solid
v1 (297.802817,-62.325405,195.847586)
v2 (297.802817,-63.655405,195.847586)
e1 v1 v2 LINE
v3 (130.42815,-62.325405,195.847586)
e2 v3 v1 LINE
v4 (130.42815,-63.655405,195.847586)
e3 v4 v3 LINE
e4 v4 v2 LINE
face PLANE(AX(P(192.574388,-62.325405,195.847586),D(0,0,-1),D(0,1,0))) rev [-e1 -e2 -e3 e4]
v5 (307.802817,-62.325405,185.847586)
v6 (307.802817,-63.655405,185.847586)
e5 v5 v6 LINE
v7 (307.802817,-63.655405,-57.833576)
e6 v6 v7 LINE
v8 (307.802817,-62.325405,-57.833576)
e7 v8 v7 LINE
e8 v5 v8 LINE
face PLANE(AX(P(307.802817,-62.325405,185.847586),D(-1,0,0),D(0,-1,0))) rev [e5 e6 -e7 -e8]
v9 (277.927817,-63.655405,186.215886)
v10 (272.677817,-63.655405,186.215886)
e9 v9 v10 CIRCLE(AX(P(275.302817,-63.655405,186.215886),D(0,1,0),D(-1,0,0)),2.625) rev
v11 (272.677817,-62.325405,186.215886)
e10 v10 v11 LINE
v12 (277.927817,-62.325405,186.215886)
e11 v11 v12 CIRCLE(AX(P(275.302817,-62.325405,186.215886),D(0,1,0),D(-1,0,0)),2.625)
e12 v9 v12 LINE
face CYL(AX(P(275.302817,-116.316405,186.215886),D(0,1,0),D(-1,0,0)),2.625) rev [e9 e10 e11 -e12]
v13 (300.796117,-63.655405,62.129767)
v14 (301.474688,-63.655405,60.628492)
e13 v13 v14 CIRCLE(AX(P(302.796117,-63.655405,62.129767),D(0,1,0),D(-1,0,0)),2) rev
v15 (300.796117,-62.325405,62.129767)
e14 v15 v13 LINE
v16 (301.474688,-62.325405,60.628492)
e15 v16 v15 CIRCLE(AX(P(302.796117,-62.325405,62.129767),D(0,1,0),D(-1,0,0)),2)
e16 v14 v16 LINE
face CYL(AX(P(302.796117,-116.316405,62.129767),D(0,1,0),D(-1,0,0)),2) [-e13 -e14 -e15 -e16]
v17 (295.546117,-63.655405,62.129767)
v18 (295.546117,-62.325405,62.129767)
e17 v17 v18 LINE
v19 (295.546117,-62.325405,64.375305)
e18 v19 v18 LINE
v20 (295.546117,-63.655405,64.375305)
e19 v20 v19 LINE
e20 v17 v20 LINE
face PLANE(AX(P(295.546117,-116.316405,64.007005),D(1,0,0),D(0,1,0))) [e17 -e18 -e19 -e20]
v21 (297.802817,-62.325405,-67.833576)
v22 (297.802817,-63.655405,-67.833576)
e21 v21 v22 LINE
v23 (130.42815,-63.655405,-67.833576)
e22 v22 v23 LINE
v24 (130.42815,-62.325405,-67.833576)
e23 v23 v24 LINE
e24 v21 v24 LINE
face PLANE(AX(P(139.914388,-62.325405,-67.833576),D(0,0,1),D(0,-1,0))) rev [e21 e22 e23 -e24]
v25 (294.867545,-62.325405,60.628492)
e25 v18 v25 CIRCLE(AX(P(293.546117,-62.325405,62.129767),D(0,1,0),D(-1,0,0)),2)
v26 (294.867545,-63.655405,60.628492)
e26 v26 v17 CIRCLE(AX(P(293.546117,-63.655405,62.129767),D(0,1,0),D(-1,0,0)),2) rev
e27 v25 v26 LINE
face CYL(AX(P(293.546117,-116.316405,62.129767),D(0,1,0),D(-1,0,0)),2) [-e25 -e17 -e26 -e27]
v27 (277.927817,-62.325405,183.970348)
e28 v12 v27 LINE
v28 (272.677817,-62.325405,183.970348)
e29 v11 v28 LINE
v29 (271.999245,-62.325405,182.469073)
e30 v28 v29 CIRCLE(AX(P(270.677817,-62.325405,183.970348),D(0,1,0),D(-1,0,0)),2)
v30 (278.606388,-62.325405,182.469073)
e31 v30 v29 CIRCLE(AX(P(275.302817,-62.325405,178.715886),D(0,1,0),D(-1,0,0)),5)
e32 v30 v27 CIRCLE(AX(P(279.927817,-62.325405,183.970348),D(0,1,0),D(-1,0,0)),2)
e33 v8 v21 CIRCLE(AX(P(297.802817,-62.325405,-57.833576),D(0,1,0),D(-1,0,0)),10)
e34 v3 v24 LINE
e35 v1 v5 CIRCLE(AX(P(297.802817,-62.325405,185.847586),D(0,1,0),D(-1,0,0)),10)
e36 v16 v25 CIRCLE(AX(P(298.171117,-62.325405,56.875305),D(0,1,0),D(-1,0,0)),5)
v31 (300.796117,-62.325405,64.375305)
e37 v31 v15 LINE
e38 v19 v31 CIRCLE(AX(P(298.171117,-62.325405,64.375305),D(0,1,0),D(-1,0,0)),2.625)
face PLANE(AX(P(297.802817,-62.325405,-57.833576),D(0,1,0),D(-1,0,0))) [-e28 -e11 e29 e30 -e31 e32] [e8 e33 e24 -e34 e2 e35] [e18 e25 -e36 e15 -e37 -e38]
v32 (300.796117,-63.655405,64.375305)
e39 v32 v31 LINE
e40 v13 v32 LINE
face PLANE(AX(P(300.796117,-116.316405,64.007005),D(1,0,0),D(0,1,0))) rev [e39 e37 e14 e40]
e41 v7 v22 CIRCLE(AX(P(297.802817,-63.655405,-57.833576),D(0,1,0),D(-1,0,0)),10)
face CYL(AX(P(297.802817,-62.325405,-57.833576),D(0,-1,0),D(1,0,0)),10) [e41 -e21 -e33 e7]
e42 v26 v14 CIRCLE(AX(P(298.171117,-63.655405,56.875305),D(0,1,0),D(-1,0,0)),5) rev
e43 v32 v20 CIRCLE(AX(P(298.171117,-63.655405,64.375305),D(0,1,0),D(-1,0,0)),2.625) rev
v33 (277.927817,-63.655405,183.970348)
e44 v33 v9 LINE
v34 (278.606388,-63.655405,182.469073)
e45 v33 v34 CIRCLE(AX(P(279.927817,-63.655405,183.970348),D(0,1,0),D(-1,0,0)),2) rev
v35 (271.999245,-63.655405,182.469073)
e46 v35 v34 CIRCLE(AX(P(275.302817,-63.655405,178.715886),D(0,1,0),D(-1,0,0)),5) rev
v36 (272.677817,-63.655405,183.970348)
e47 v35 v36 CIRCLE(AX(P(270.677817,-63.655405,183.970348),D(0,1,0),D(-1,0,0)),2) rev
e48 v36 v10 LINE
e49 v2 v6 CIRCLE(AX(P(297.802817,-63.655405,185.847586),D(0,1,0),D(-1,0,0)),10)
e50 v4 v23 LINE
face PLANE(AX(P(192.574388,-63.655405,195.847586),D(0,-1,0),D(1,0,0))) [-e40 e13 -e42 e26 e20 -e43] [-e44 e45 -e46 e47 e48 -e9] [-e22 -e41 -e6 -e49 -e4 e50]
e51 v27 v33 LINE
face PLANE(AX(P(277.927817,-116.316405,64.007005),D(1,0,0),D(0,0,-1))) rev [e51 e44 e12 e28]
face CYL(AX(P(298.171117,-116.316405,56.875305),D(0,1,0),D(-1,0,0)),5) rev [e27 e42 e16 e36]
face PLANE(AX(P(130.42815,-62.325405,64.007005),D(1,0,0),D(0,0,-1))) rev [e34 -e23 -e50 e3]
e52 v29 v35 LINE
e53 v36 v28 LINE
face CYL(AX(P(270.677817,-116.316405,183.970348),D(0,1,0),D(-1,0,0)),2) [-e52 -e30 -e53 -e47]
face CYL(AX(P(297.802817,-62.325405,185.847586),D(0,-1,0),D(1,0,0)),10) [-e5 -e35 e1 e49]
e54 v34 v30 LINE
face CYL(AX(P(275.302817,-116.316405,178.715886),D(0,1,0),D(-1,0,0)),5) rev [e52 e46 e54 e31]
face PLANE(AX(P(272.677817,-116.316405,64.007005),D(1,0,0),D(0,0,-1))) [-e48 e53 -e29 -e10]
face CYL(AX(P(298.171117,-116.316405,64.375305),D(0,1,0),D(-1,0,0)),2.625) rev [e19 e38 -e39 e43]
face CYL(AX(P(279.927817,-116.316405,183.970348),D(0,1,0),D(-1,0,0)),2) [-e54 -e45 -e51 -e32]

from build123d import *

# Parameters (mm, degrees)
BASE_FLANGE2_DEPTH         = 1.33
EDGE_FLANGE3_DEPTH         = 263.681161317
CAPTIVE_M5_BOLT_SLOT_REACH = 370.8
HOLE_FILLETS_R             = 2
HEM2_START                 = -67.833575783
HEM2_DEPTH                 = 263.681161317
HEM2_2_DEPTH               = 263.681161317
FLAT_PATTERN2_START        = -67.833575783
FLAT_PATTERN2_DEPTH        = 263.681161317
FLAT_PATTERN2_2_DEPTH      = 263.681161317


# Read off the part's stored shape, not the designer's step: Hem2, Flat-Pattern2
# Sheet-metal steps are written as plain solids
with BuildPart() as part:
    # Sketch5 → Base-Flange2 (new body)
    with BuildSketch(Plane(origin=(0, -63.655404639, 0), x_dir=(-1, 0, 0), z_dir=(0, 1, 0))):
        with BuildLine():
            Line((-297.802816543, 195.847585534), (-194.039416543, 195.847585534))
            Line((-194.039416543, 195.847585534), (-194.039416543, -67.833575783))
            Line((-194.039416543, -67.833575783), (-297.802816543, -67.833575783))
            ThreePointArc((-297.802816543, -67.833575783), (-304.873884355, -64.904643594), (-307.802816543, -57.833575783))
            Line((-307.802816543, -57.833575783), (-307.802816543, 185.847585534))
            ThreePointArc((-307.802816543, 185.847585534), (-304.873884355, 192.918653346), (-297.802816543, 195.847585534))
        make_face()
    extrude(amount=BASE_FLANGE2_DEPTH)

    # Edge-Flange3 section (across the edge) → Edge-Flange3 (add)
    with BuildSketch(Plane(origin=(193.302816543, -63.655404639, 195.847585534), x_dir=(1, 0, 0), z_dir=(0, 0, -1))):
        with BuildLine():
            Line((-1.33, 0.7366), (-1.33, 52.66))
            Line((-1.33, 52.66), (0, 52.66))
            Line((0, 52.66), (0, 0.7366))
            ThreePointArc((0, 0.7366), (0.215745145, 0.215745145), (0.7366, 0))
            Line((0.7366, 0), (0.7366, -1.33))
            ThreePointArc((0.7366, -1.33), (-0.724706874, -0.724706874), (-1.33, 0.7366))
        make_face()
    extrude(amount=EDGE_FLANGE3_DEPTH)

    # Sketch17 → Captive M5 Bolt Slot (cut, up to next)
    with BuildSketch(Plane(origin=(0, -62.325404639, 0), x_dir=(1, 0, 0), z_dir=(0, 1, 0)), mode=Mode.PRIVATE) as captive_m5_bolt_slot_sk1:
        with BuildLine():
            ThreePointArc((280.302816543, -178.715885534), (272.866117957, -174.349823235), (272.677816543, -182.971396667))
            Line((272.677816543, -182.971396667), (272.677816543, -178.715885534))
            ThreePointArc((272.677816543, -178.715885534), (275.302816543, -176.090885534), (277.927816543, -178.715885534))
            Line((277.927816543, -178.715885534), (277.927816543, -182.971396667))
            ThreePointArc((277.927816543, -182.971396667), (279.668878843, -181.15258412), (280.302816543, -178.715885534))
        make_face()
    captive_m5_bolt_slot_tool1 = extrude(captive_m5_bolt_slot_sk1.sketch, amount=-CAPTIVE_M5_BOLT_SLOT_REACH, mode=Mode.PRIVATE) & part.part
    # Sketch17 → Captive M5 Bolt Slot (cut, up to next)
    with BuildSketch(Plane(origin=(0, -62.325404639, 0), x_dir=(1, 0, 0), z_dir=(0, 1, 0)), mode=Mode.PRIVATE) as captive_m5_bolt_slot_sk2:
        with BuildLine():
            Line((272.677816543, -178.715885534), (272.677816543, -182.971396667))
            ThreePointArc((272.677816543, -182.971396667), (275.302816543, -183.715885534), (277.927816543, -182.971396667))
            Line((277.927816543, -182.971396667), (277.927816543, -178.715885534))
            ThreePointArc((277.927816543, -178.715885534), (275.302816543, -176.090885534), (272.677816543, -178.715885534))
        make_face()
    captive_m5_bolt_slot_tool2 = extrude(captive_m5_bolt_slot_sk2.sketch, amount=-CAPTIVE_M5_BOLT_SLOT_REACH, mode=Mode.PRIVATE) & part.part
    # Sketch17 → Captive M5 Bolt Slot (cut, up to next)
    with BuildSketch(Plane(origin=(0, -62.325404639, 0), x_dir=(1, 0, 0), z_dir=(0, 1, 0)), mode=Mode.PRIVATE) as captive_m5_bolt_slot_sk3:
        with BuildLine():
            ThreePointArc((280.302816543, -178.715885534), (272.866117957, -174.349823235), (272.677816543, -182.971396667))
            Line((272.677816543, -182.971396667), (272.677816543, -178.715885534))
            ThreePointArc((272.677816543, -178.715885534), (275.302816543, -176.090885534), (277.927816543, -178.715885534))
            Line((277.927816543, -178.715885534), (277.927816543, -182.971396667))
            ThreePointArc((277.927816543, -182.971396667), (279.668878843, -181.15258412), (280.302816543, -178.715885534))
        make_face()
    captive_m5_bolt_slot_tool3 = extrude(captive_m5_bolt_slot_sk3.sketch, amount=-CAPTIVE_M5_BOLT_SLOT_REACH, mode=Mode.PRIVATE) & part.part
    # Sketch17 → Captive M5 Bolt Slot (cut, up to next)
    with BuildSketch(Plane(origin=(0, -62.325404639, 0), x_dir=(1, 0, 0), z_dir=(0, 1, 0)), mode=Mode.PRIVATE) as captive_m5_bolt_slot_sk4:
        with BuildLine():
            Line((272.677816543, -178.715885534), (272.677816543, -182.971396667))
            ThreePointArc((272.677816543, -182.971396667), (275.302816543, -183.715885534), (277.927816543, -182.971396667))
            Line((277.927816543, -182.971396667), (277.927816543, -178.715885534))
            ThreePointArc((277.927816543, -178.715885534), (275.302816543, -176.090885534), (272.677816543, -178.715885534))
        make_face()
    captive_m5_bolt_slot_tool4 = extrude(captive_m5_bolt_slot_sk4.sketch, amount=-CAPTIVE_M5_BOLT_SLOT_REACH, mode=Mode.PRIVATE) & part.part
    # Sketch17 → Captive M5 Bolt Slot (cut, up to next)
    with BuildSketch(Plane(origin=(0, -62.325404639, 0), x_dir=(1, 0, 0), z_dir=(0, 1, 0)), mode=Mode.PRIVATE) as captive_m5_bolt_slot_sk5:
        with BuildLine():
            Line((272.677816543, -182.971396667), (272.677816543, -186.215885534))
            ThreePointArc((272.677816543, -186.215885534), (275.302816543, -188.840885534), (277.927816543, -186.215885534))
            Line((277.927816543, -186.215885534), (277.927816543, -182.971396667))
            ThreePointArc((277.927816543, -182.971396667), (275.302816543, -183.715885534), (272.677816543, -182.971396667))
        make_face()
    captive_m5_bolt_slot_tool5 = extrude(captive_m5_bolt_slot_sk5.sketch, amount=-CAPTIVE_M5_BOLT_SLOT_REACH, mode=Mode.PRIVATE) & part.part
    # Sketch17 → Captive M5 Bolt Slot (cut, up to next)
    with BuildSketch(Plane(origin=(0, -62.325404639, 0), x_dir=(1, 0, 0), z_dir=(0, 1, 0)), mode=Mode.PRIVATE) as captive_m5_bolt_slot_sk6:
        with BuildLine():
            ThreePointArc((303.171116543, -56.875304876), (295.734417957, -52.509242577), (295.546116543, -61.130816008))
            Line((295.546116543, -61.130816008), (295.546116543, -56.875304876))
            ThreePointArc((295.546116543, -56.875304876), (298.171116543, -54.250304876), (300.796116543, -56.875304876))
            Line((300.796116543, -56.875304876), (300.796116543, -61.130816008))
            ThreePointArc((300.796116543, -61.130816008), (302.537178843, -59.312003462), (303.171116543, -56.875304876))
        make_face()
    captive_m5_bolt_slot_tool6 = extrude(captive_m5_bolt_slot_sk6.sketch, amount=-CAPTIVE_M5_BOLT_SLOT_REACH, mode=Mode.PRIVATE) & part.part
    # Sketch17 → Captive M5 Bolt Slot (cut, up to next)
    with BuildSketch(Plane(origin=(0, -62.325404639, 0), x_dir=(1, 0, 0), z_dir=(0, 1, 0)), mode=Mode.PRIVATE) as captive_m5_bolt_slot_sk7:
        with BuildLine():
            Line((295.546116543, -56.875304876), (295.546116543, -61.130816008))
            ThreePointArc((295.546116543, -61.130816008), (298.171116543, -61.875304876), (300.796116543, -61.130816008))
            Line((300.796116543, -61.130816008), (300.796116543, -56.875304876))
            ThreePointArc((300.796116543, -56.875304876), (298.171116543, -54.250304876), (295.546116543, -56.875304876))
        make_face()
    captive_m5_bolt_slot_tool7 = extrude(captive_m5_bolt_slot_sk7.sketch, amount=-CAPTIVE_M5_BOLT_SLOT_REACH, mode=Mode.PRIVATE) & part.part
    # Sketch17 → Captive M5 Bolt Slot (cut, up to next)
    with BuildSketch(Plane(origin=(0, -62.325404639, 0), x_dir=(1, 0, 0), z_dir=(0, 1, 0)), mode=Mode.PRIVATE) as captive_m5_bolt_slot_sk8:
        with BuildLine():
            ThreePointArc((303.171116543, -56.875304876), (295.734417957, -52.509242577), (295.546116543, -61.130816008))
            Line((295.546116543, -61.130816008), (295.546116543, -56.875304876))
            ThreePointArc((295.546116543, -56.875304876), (298.171116543, -54.250304876), (300.796116543, -56.875304876))
            Line((300.796116543, -56.875304876), (300.796116543, -61.130816008))
            ThreePointArc((300.796116543, -61.130816008), (302.537178843, -59.312003462), (303.171116543, -56.875304876))
        make_face()
    captive_m5_bolt_slot_tool8 = extrude(captive_m5_bolt_slot_sk8.sketch, amount=-CAPTIVE_M5_BOLT_SLOT_REACH, mode=Mode.PRIVATE) & part.part
    # Sketch17 → Captive M5 Bolt Slot (cut, up to next)
    with BuildSketch(Plane(origin=(0, -62.325404639, 0), x_dir=(1, 0, 0), z_dir=(0, 1, 0)), mode=Mode.PRIVATE) as captive_m5_bolt_slot_sk9:
        with BuildLine():
            Line((295.546116543, -56.875304876), (295.546116543, -61.130816008))
            ThreePointArc((295.546116543, -61.130816008), (298.171116543, -61.875304876), (300.796116543, -61.130816008))
            Line((300.796116543, -61.130816008), (300.796116543, -56.875304876))
            ThreePointArc((300.796116543, -56.875304876), (298.171116543, -54.250304876), (295.546116543, -56.875304876))
        make_face()
    captive_m5_bolt_slot_tool9 = extrude(captive_m5_bolt_slot_sk9.sketch, amount=-CAPTIVE_M5_BOLT_SLOT_REACH, mode=Mode.PRIVATE) & part.part
    # Sketch17 → Captive M5 Bolt Slot (cut, up to next)
    with BuildSketch(Plane(origin=(0, -62.325404639, 0), x_dir=(1, 0, 0), z_dir=(0, 1, 0)), mode=Mode.PRIVATE) as captive_m5_bolt_slot_sk10:
        with BuildLine():
            Line((295.546116543, -61.130816008), (295.546116543, -64.375304876))
            ThreePointArc((295.546116543, -64.375304876), (298.171116543, -67.000304876), (300.796116543, -64.375304876))
            Line((300.796116543, -64.375304876), (300.796116543, -61.130816008))
            ThreePointArc((300.796116543, -61.130816008), (298.171116543, -61.875304876), (295.546116543, -61.130816008))
        make_face()
    captive_m5_bolt_slot_tool10 = extrude(captive_m5_bolt_slot_sk10.sketch, amount=-CAPTIVE_M5_BOLT_SLOT_REACH, mode=Mode.PRIVATE) & part.part
    add(captive_m5_bolt_slot_tool1.solids().sort_by_distance((272.932522, -62.325405, 174.468806))[0], mode=Mode.SUBTRACT)
    add(captive_m5_bolt_slot_tool2.solids().sort_by_distance((275.302817, -62.325405, 180.043279))[0], mode=Mode.SUBTRACT)
    add(captive_m5_bolt_slot_tool3.solids().sort_by_distance((272.932522, -62.325405, 174.468806))[0], mode=Mode.SUBTRACT)
    add(captive_m5_bolt_slot_tool4.solids().sort_by_distance((275.302817, -62.325405, 180.043279))[0], mode=Mode.SUBTRACT)
    add(captive_m5_bolt_slot_tool5.solids().sort_by_distance((275.302817, -62.325405, 185.907324))[0], mode=Mode.SUBTRACT)
    add(captive_m5_bolt_slot_tool6.solids().sort_by_distance((302.418196, -62.325405, 59.245599))[0], mode=Mode.SUBTRACT)
    add(captive_m5_bolt_slot_tool7.solids().sort_by_distance((298.171117, -62.325405, 58.202699))[0], mode=Mode.SUBTRACT)
    add(captive_m5_bolt_slot_tool8.solids().sort_by_distance((302.418196, -62.325405, 59.245599))[0], mode=Mode.SUBTRACT)
    add(captive_m5_bolt_slot_tool9.solids().sort_by_distance((298.171117, -62.325405, 58.202699))[0], mode=Mode.SUBTRACT)
    add(captive_m5_bolt_slot_tool10.solids().sort_by_distance((298.171117, -62.325405, 64.066743))[0], mode=Mode.SUBTRACT)

    # Hole Fillets
    hole_fillets_edges = [part.edges().sort_by_distance(p)[0] for p in [
        (272.677816543, -62.990404639, 182.971396667),
        (277.927816543, -62.990404639, 182.971396667),
        (300.796116543, -62.990404639, 61.130816008),
        (295.546116543, -62.990404639, 61.130816008),
    ]]
    fillet(hole_fillets_edges, radius=HOLE_FILLETS_R)

    # Hem2 outline → Hem2 (cut)
    with BuildSketch(Plane.XY.offset(HEM2_START)):
        with BuildLine():
            Line((193.302816543, -116.315404639), (193.302816543, -116.314498544))
            ThreePointArc((193.302816543, -116.314498544), (192.359488803, -115.893371235), (191.972816543, -114.935404639))
            Line((191.972816543, -114.935404639), (191.972816543, -116.315404639))
            Line((191.972816543, -116.315404639), (193.302816543, -116.315404639))
        make_face()
    extrude(amount=HEM2_DEPTH, mode=Mode.SUBTRACT)

    # Hem2 2 outline → Hem2 2 (add)
    with BuildSketch(Plane.XY.offset(HEM2_START)):
        with BuildLine():
            Line((194.732816543, -106.315404639), (193.402816543, -106.315404639))
            Line((193.402816543, -106.315404639), (193.402816543, -114.935404639))
            ThreePointArc((193.402816543, -114.935404639), (193.352816543, -114.985404639), (193.302816543, -114.935404639))
            Line((193.302816543, -114.935404639), (193.302816543, -116.314498544))
            ThreePointArc((193.302816543, -116.314498544), (194.310783139, -115.928732379), (194.732816543, -114.935404639))
            Line((194.732816543, -114.935404639), (194.732816543, -106.315404639))
        make_face()
    extrude(amount=HEM2_2_DEPTH)

    # Flat-Pattern2 outline → Flat-Pattern2 (cut)
    with BuildSketch(Plane.XY.offset(FLAT_PATTERN2_START)):
        with BuildLine():
            Line((194.039416543, -63.655404639), (192.108547309, -63.655404639))
            ThreePointArc((192.108547309, -63.655404639), (192.007032485, -64.017504171), (191.972816543, -64.392004639))
            Line((191.972816543, -64.392004639), (191.972816543, -114.935404639))
            ThreePointArc((191.972816543, -114.935404639), (193.352816543, -116.315404639), (194.732816543, -114.935404639))
            Line((194.732816543, -114.935404639), (194.732816543, -106.315404639))
            Line((194.732816543, -106.315404639), (193.402816543, -106.315404639))
            Line((193.402816543, -106.315404639), (193.402816543, -114.935404639))
            ThreePointArc((193.402816543, -114.935404639), (193.352816543, -114.985404639), (193.302816543, -114.935404639))
            Line((193.302816543, -114.935404639), (193.302816543, -64.392004639))
            ThreePointArc((193.302816543, -64.392004639), (193.518561688, -63.871149784), (194.039416543, -63.655404639))
        make_face()
    extrude(amount=FLAT_PATTERN2_DEPTH, mode=Mode.SUBTRACT)

    # Flat-Pattern2 2 outline → Flat-Pattern2 2 (add)
    with BuildSketch(Plane.XY.offset(FLAT_PATTERN2_START)):
        with BuildLine():
            ThreePointArc((192.108547309, -63.655404639), (192.867115814, -62.690080269), (194.039416543, -62.325404639))
            Line((194.039416543, -62.325404639), (130.428149664, -62.325404639))
            Line((130.428149664, -62.325404639), (130.428149664, -63.655404639))
            Line((130.428149664, -63.655404639), (192.108547309, -63.655404639))
        make_face()
    extrude(amount=FLAT_PATTERN2_2_DEPTH)


solid = part.part
